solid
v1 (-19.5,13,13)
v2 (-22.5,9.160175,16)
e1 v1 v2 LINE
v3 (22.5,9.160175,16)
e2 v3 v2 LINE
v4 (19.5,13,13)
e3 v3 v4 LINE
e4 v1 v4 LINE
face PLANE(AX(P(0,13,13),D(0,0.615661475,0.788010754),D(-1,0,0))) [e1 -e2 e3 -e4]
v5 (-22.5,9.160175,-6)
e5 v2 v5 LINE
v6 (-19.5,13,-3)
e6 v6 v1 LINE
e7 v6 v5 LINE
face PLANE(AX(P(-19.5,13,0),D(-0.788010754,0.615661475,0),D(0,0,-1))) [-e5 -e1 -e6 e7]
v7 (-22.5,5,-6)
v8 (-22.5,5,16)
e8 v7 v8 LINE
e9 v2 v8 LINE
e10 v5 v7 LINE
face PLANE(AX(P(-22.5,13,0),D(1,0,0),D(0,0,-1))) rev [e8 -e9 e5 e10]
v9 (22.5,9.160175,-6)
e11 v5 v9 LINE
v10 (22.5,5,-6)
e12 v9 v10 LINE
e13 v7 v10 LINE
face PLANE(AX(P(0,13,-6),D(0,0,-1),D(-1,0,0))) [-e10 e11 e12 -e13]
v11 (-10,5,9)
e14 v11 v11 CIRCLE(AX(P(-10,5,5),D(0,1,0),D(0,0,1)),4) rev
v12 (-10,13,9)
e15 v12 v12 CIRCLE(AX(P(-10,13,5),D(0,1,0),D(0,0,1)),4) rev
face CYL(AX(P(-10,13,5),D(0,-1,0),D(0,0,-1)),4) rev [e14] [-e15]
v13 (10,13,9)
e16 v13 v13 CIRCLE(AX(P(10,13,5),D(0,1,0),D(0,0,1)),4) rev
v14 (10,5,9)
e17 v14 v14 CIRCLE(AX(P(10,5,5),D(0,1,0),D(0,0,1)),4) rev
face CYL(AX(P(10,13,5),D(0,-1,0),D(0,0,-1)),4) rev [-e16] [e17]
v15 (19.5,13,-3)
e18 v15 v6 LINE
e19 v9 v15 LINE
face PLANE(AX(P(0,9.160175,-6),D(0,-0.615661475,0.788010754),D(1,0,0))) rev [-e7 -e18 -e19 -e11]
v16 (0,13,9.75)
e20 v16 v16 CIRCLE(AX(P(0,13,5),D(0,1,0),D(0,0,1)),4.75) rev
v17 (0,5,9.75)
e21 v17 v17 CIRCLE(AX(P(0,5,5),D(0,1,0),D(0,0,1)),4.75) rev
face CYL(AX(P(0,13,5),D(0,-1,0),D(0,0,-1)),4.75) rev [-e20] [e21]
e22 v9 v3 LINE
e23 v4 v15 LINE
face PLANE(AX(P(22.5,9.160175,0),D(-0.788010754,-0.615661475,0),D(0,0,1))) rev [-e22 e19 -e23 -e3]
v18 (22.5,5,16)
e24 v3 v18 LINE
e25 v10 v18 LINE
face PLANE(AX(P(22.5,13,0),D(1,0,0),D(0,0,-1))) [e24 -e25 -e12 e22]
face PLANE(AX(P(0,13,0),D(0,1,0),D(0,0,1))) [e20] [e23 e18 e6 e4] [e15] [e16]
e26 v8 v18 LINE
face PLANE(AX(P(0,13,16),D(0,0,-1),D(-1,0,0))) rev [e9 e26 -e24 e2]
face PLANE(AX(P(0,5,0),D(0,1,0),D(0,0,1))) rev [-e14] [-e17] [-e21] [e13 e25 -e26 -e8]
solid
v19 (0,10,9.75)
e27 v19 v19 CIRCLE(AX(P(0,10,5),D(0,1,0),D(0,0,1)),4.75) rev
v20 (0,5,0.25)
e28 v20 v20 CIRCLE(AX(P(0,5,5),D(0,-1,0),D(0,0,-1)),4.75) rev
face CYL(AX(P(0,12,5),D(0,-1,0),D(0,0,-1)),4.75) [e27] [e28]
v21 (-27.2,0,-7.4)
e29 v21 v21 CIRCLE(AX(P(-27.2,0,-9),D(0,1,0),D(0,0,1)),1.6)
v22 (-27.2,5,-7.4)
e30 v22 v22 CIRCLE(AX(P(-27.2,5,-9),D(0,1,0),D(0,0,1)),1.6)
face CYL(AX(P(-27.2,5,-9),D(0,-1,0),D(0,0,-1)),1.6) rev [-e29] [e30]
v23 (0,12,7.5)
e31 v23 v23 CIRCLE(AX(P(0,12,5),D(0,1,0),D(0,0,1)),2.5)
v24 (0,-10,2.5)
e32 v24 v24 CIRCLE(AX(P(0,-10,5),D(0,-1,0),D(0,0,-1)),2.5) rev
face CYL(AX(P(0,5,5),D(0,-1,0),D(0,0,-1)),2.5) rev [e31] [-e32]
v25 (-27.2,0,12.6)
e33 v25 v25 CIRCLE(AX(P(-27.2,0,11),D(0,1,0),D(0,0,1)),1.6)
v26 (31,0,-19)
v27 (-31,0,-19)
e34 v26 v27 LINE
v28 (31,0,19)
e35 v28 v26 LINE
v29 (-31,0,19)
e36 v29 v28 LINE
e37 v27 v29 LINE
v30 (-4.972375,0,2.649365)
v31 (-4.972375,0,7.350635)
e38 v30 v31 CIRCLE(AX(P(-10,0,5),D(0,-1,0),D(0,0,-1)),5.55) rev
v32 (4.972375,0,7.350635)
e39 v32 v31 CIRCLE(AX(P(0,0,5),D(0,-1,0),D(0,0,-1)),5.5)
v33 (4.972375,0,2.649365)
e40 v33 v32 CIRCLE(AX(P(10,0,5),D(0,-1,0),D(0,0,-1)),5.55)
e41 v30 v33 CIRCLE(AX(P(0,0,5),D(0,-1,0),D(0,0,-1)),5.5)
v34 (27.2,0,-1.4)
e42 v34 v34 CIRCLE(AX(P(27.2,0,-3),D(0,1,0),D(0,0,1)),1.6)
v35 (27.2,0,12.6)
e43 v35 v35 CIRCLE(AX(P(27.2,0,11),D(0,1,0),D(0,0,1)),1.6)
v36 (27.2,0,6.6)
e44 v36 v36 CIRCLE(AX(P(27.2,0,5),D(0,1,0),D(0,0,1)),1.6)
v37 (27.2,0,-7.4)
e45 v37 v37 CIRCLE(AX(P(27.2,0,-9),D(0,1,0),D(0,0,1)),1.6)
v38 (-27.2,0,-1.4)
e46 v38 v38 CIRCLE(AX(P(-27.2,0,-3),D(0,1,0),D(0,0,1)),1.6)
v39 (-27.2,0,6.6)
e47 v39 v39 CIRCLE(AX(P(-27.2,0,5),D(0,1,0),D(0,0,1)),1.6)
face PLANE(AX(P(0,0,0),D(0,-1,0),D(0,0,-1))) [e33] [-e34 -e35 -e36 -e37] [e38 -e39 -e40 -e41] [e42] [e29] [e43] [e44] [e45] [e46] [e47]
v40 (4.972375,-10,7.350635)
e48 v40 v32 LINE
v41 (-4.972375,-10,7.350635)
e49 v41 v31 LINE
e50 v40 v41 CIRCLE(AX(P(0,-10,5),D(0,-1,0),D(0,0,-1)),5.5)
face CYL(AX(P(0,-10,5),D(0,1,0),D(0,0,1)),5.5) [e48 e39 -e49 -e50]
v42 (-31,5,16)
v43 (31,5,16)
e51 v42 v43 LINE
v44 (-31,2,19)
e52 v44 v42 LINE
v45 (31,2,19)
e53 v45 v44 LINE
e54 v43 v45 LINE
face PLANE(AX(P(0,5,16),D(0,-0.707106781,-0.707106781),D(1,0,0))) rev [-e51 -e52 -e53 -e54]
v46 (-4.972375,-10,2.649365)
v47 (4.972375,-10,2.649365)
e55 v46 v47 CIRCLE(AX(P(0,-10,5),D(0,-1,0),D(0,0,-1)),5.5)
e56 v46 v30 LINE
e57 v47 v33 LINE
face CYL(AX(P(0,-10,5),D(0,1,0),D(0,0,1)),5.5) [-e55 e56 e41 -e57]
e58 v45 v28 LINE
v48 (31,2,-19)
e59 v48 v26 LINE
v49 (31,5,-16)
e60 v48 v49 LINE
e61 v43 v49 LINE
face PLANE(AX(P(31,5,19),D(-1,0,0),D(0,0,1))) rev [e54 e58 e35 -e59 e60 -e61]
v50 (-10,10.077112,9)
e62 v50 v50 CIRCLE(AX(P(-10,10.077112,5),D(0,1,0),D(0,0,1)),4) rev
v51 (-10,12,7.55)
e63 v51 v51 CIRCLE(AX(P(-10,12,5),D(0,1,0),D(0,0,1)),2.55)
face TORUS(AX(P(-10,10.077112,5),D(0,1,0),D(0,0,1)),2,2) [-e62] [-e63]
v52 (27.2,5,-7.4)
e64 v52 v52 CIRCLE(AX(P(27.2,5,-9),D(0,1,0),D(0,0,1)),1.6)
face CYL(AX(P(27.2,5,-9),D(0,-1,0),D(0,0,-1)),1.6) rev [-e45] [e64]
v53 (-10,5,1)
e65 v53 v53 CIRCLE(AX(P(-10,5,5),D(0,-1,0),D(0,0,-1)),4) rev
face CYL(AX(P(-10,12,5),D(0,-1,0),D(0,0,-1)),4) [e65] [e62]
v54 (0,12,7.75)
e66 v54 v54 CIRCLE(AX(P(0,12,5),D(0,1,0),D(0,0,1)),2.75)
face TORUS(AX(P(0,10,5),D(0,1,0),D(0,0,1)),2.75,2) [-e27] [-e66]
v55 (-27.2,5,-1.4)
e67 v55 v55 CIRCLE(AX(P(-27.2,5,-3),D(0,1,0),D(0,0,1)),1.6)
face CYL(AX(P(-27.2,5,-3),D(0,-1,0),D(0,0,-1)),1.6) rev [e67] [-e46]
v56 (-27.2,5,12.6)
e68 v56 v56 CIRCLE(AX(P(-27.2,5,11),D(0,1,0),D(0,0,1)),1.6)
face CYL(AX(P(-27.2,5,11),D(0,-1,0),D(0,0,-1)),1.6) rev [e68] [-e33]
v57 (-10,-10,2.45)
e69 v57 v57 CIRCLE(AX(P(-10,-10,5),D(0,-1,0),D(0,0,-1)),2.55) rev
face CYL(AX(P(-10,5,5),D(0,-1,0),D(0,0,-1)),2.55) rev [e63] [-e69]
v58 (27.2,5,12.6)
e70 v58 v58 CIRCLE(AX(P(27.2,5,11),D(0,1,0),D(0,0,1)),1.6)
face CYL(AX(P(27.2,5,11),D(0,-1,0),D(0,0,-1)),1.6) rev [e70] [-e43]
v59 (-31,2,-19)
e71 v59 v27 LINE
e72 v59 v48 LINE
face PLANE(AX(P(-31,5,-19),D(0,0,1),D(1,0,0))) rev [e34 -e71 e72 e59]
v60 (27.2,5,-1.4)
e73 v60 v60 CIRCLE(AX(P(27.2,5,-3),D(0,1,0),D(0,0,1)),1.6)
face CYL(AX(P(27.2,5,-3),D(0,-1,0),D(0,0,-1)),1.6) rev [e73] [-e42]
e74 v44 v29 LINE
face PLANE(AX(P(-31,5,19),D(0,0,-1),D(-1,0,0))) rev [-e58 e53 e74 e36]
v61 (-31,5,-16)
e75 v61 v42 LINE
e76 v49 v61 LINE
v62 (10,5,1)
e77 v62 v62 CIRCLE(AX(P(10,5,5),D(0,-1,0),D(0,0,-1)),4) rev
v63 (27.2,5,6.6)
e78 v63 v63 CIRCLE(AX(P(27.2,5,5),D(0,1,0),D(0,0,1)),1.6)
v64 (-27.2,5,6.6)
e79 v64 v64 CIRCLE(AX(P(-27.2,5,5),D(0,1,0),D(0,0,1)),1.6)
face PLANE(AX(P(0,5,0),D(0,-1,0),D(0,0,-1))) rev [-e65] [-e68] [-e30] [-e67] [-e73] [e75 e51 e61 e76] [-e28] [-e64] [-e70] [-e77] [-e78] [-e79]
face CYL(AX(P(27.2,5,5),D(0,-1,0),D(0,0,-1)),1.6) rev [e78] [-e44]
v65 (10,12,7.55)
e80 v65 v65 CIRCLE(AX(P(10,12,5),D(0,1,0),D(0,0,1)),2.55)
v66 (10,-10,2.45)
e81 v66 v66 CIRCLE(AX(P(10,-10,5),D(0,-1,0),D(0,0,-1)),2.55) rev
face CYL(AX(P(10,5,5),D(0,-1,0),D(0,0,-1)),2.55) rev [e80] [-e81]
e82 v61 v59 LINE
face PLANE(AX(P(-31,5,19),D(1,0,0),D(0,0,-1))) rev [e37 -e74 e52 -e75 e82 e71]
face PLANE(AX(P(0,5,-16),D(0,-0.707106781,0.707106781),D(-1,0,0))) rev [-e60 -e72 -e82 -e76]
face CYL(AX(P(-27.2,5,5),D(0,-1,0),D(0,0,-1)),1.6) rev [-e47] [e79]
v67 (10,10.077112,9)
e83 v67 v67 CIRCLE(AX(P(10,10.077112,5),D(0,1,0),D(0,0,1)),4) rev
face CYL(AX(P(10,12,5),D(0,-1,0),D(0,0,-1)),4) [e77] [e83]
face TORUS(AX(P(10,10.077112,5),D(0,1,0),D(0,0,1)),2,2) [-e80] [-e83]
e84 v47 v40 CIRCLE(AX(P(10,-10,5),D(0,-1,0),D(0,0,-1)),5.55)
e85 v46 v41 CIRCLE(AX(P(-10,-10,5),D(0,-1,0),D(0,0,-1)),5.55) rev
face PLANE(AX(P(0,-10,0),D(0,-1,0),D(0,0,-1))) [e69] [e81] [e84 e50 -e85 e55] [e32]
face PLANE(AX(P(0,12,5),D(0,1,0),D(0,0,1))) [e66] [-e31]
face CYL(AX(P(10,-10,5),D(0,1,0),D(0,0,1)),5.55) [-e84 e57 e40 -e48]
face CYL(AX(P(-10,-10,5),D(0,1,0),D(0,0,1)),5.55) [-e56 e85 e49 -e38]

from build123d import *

# Parameters (mm, degrees)
CROQUIS1_W              = 62
CROQUIS1_H              = 38
CROQUIS1_R              = 1.6
CROQUIS1_R_2            = 2.5
CROQUIS1_R_3            = 2.55
SALIENTE_EXTRUIR1_DEPTH = 5
CROQUIS2_R              = 4.75
CROQUIS2_R_2            = 2.5
SALIENTE_EXTRUIR2_DEPTH = 7
REDONDEO2_R             = 2
CROQUIS4_R              = 4
CROQUIS4_R_2            = 2.55
SALIENTE_EXTRUIR3_DEPTH = 7
REDONDEO3_R             = 2
CHAFL_N1_SIZE           = 3
CROQUIS5_W              = 45
CROQUIS5_H              = 22
CROQUIS5_R              = 4
CROQUIS5_R_2            = 4.75
SALIENTE_EXTRUIR4_DEPTH = 8
SALIENTE_EXTRUIR7_START = 10
CROQUIS9_R              = 2.55
CROQUIS9_R_2            = 2.5
SALIENTE_EXTRUIR7_DEPTH = 10
CHAFL_N2_SIZE           = 3
CHAFL_N2_SIZE2          = 3.839824897


with BuildPart() as part:
    # Croquis1 → Saliente-Extruir1 (new body)
    with BuildSketch(Plane(origin=(0, 0, 0), x_dir=(1, 0, 0), z_dir=(0, 1, 0))):
        Rectangle(CROQUIS1_W, CROQUIS1_H)
        with Locations(Location((27.2, -11, 0), (0, 0, 270))):
            Circle(CROQUIS1_R, mode=Mode.SUBTRACT)
        with Locations(Location((27.2, -5, 0), (0, 0, 270))):
            Circle(CROQUIS1_R, mode=Mode.SUBTRACT)
        with Locations(Location((-27.2, -11, 0), (0, 0, 270))):
            Circle(CROQUIS1_R, mode=Mode.SUBTRACT)
        with Locations(Location((-27.2, -5, 0), (0, 0, 270))):
            Circle(CROQUIS1_R, mode=Mode.SUBTRACT)
        with Locations(Location((27.2, 9, 0), (0, 0, 270))):
            Circle(CROQUIS1_R, mode=Mode.SUBTRACT)
        with Locations(Location((27.2, 3, 0), (0, 0, 270))):
            Circle(CROQUIS1_R, mode=Mode.SUBTRACT)
        with Locations(Location((-27.2, 3, 0), (0, 0, 270))):
            Circle(CROQUIS1_R, mode=Mode.SUBTRACT)
        with Locations(Location((-27.2, 9, 0), (0, 0, 270))):
            Circle(CROQUIS1_R, mode=Mode.SUBTRACT)
        with Locations(Location((0, -5, 0), (0, 0, 270))):
            Circle(CROQUIS1_R_2, mode=Mode.SUBTRACT)
        with Locations(Location((10, -5, 0), (0, 0, 270))):
            Circle(CROQUIS1_R_3, mode=Mode.SUBTRACT)
        with Locations(Location((-10, -5, 0), (0, 0, 270))):
            Circle(CROQUIS1_R_3, mode=Mode.SUBTRACT)
    extrude(amount=SALIENTE_EXTRUIR1_DEPTH)

    # Croquis2 → Saliente-Extruir2 (add)
    with BuildSketch(Plane(origin=(0, 5, 0), x_dir=(1, 0, 0), z_dir=(0, 1, 0))):
        with Locations(Location((0, -5, 0), (0, 0, 90))):
            Circle(CROQUIS2_R)
        with Locations(Location((0, -5, 0), (0, 0, 270))):
            Circle(CROQUIS2_R_2, mode=Mode.SUBTRACT)
    extrude(amount=SALIENTE_EXTRUIR2_DEPTH)

    # Redondeo2
    redondeo2_edges = [part.edges().sort_by_distance(p)[0] for p in [
        (0, 12, 9.75),
    ]]
    fillet(redondeo2_edges, radius=REDONDEO2_R)

    # Croquis4 → Saliente-Extruir3 (add)
    # profile 1 of 2: a face of its own
    with BuildSketch(Plane(origin=(0, 5, 0), x_dir=(1, 0, 0), z_dir=(0, 1, 0))):
        with Locations(Location((-10, -5, 0), (0, 0, 90))):
            Circle(CROQUIS4_R)
        with Locations(Location((-10, -5, 0), (0, 0, 270))):
            Circle(CROQUIS4_R_2, mode=Mode.SUBTRACT)
    # profile 2 of 2: a face of its own
    with BuildSketch(Plane(origin=(0, 5, 0), x_dir=(1, 0, 0), z_dir=(0, 1, 0))):
        with Locations(Location((10, -5, 0), (0, 0, 90))):
            Circle(CROQUIS4_R)
        with Locations(Location((10, -5, 0), (0, 0, 270))):
            Circle(CROQUIS4_R_2, mode=Mode.SUBTRACT)
    extrude(amount=SALIENTE_EXTRUIR3_DEPTH)

    # Redondeo3
    # the kernel refuses this fillet: 2 mm, written as the material it takes off along each edge
    with BuildSketch(Plane(origin=(-10, 12, 5), x_dir=(0, 0, -1), z_dir=(1, 0, 0))) as redondeo3_piece_1:
        with BuildLine():
            CenterArc((2, -1.922888452), REDONDEO3_R, 0, 74.037985837)
            Line((4, -1.922888452), (4.04, -1.922888452))
            Line((4.04, -1.922888452), (4.04, 0))
            Line((4.04, 0), (4, 0.04))
            ThreePointArc((4, 0.04), (3.275, 0.04), (2.561, 0.038457769))
            Line((2.561, 0.038457769), (2.55, 0))
        make_face()
    revolve(axis=Axis((-10, 12, 5), (0, 1, 0)), mode=Mode.SUBTRACT)
    with BuildSketch(Plane(origin=(10, 12, 5), x_dir=(0, 0, -1), z_dir=(1, 0, 0))) as redondeo3_piece_2:
        with BuildLine():
            CenterArc((2, -1.922888452), REDONDEO3_R, 0, 74.037985837)
            Line((4, -1.922888452), (4.04, -1.922888452))
            Line((4.04, -1.922888452), (4.04, 0))
            Line((4.04, 0), (4, 0.04))
            ThreePointArc((4, 0.04), (3.275, 0.04), (2.561, 0.038457769))
            Line((2.561, 0.038457769), (2.55, 0))
        make_face()
    revolve(axis=Axis((10, 12, 5), (0, 1, 0)), mode=Mode.SUBTRACT)

    # Chaflán1
    chafl_n1_edges = [part.edges().sort_by_distance(p)[0] for p in [
        (0, 5, 19),
        (0, 5, -19),
    ]]
    chamfer(chafl_n1_edges, length=CHAFL_N1_SIZE)

    # Croquis9 → Saliente-Extruir7 (add)
    with BuildSketch(Plane.XZ.offset(SALIENTE_EXTRUIR7_START)):
        with BuildLine():
            ThreePointArc((4.972375, 2.649364584), (15.55, 5), (4.972375, 7.350635416))
            ThreePointArc((4.972375, 7.350635416), (0, 10.5), (-4.972375, 7.350635416))
            ThreePointArc((-4.972375, 7.350635416), (-15.55, 5), (-4.972375, 2.649364584))
            ThreePointArc((-4.972375, 2.649364584), (0, -0.5), (4.972375, 2.649364584))
        make_face()
        with Locations(Location((10, 5, 0), (0, 0, 270))):
            Circle(CROQUIS9_R, mode=Mode.SUBTRACT)
        with Locations(Location((0, 5, 0), (0, 0, 270))):
            Circle(CROQUIS9_R_2, mode=Mode.SUBTRACT)
        with Locations(Location((-10, 5, 0), (0, 0, 270))):
            Circle(CROQUIS9_R, mode=Mode.SUBTRACT)
    extrude(amount=-SALIENTE_EXTRUIR7_DEPTH)


with BuildPart() as body_2:
    # Croquis5 → Saliente-Extruir4 (new body)
    with BuildSketch(Plane(origin=(0, 5, 0), x_dir=(1, 0, 0), z_dir=(0, 1, 0))):
        with Locations((0, -5)):
            Rectangle(CROQUIS5_W, CROQUIS5_H)
        with Locations((10, -5)):
            Circle(CROQUIS5_R, mode=Mode.SUBTRACT)
        with Locations((-10, -5)):
            Circle(CROQUIS5_R, mode=Mode.SUBTRACT)
        with Locations((0, -5)):
            Circle(CROQUIS5_R_2, mode=Mode.SUBTRACT)
    extrude(amount=SALIENTE_EXTRUIR4_DEPTH)

    # Chaflán2
    chafl_n2_edges = [body_2.edges().sort_by_distance(p)[0] for p in [
        (0, 13, -6),
        (-22.5, 13, 5),
        (0, 13, 16),
        (22.5, 13, 5),
    ]]
    chafl_n2_side = [body_2.faces().sort_by_distance(p)[0] for p in [
        (21.999100809, 13, 5),
    ]]
    chamfer(chafl_n2_edges, length=CHAFL_N2_SIZE, length2=CHAFL_N2_SIZE2, reference=chafl_n2_side[0])


solid = Compound([part.part, body_2.part])
